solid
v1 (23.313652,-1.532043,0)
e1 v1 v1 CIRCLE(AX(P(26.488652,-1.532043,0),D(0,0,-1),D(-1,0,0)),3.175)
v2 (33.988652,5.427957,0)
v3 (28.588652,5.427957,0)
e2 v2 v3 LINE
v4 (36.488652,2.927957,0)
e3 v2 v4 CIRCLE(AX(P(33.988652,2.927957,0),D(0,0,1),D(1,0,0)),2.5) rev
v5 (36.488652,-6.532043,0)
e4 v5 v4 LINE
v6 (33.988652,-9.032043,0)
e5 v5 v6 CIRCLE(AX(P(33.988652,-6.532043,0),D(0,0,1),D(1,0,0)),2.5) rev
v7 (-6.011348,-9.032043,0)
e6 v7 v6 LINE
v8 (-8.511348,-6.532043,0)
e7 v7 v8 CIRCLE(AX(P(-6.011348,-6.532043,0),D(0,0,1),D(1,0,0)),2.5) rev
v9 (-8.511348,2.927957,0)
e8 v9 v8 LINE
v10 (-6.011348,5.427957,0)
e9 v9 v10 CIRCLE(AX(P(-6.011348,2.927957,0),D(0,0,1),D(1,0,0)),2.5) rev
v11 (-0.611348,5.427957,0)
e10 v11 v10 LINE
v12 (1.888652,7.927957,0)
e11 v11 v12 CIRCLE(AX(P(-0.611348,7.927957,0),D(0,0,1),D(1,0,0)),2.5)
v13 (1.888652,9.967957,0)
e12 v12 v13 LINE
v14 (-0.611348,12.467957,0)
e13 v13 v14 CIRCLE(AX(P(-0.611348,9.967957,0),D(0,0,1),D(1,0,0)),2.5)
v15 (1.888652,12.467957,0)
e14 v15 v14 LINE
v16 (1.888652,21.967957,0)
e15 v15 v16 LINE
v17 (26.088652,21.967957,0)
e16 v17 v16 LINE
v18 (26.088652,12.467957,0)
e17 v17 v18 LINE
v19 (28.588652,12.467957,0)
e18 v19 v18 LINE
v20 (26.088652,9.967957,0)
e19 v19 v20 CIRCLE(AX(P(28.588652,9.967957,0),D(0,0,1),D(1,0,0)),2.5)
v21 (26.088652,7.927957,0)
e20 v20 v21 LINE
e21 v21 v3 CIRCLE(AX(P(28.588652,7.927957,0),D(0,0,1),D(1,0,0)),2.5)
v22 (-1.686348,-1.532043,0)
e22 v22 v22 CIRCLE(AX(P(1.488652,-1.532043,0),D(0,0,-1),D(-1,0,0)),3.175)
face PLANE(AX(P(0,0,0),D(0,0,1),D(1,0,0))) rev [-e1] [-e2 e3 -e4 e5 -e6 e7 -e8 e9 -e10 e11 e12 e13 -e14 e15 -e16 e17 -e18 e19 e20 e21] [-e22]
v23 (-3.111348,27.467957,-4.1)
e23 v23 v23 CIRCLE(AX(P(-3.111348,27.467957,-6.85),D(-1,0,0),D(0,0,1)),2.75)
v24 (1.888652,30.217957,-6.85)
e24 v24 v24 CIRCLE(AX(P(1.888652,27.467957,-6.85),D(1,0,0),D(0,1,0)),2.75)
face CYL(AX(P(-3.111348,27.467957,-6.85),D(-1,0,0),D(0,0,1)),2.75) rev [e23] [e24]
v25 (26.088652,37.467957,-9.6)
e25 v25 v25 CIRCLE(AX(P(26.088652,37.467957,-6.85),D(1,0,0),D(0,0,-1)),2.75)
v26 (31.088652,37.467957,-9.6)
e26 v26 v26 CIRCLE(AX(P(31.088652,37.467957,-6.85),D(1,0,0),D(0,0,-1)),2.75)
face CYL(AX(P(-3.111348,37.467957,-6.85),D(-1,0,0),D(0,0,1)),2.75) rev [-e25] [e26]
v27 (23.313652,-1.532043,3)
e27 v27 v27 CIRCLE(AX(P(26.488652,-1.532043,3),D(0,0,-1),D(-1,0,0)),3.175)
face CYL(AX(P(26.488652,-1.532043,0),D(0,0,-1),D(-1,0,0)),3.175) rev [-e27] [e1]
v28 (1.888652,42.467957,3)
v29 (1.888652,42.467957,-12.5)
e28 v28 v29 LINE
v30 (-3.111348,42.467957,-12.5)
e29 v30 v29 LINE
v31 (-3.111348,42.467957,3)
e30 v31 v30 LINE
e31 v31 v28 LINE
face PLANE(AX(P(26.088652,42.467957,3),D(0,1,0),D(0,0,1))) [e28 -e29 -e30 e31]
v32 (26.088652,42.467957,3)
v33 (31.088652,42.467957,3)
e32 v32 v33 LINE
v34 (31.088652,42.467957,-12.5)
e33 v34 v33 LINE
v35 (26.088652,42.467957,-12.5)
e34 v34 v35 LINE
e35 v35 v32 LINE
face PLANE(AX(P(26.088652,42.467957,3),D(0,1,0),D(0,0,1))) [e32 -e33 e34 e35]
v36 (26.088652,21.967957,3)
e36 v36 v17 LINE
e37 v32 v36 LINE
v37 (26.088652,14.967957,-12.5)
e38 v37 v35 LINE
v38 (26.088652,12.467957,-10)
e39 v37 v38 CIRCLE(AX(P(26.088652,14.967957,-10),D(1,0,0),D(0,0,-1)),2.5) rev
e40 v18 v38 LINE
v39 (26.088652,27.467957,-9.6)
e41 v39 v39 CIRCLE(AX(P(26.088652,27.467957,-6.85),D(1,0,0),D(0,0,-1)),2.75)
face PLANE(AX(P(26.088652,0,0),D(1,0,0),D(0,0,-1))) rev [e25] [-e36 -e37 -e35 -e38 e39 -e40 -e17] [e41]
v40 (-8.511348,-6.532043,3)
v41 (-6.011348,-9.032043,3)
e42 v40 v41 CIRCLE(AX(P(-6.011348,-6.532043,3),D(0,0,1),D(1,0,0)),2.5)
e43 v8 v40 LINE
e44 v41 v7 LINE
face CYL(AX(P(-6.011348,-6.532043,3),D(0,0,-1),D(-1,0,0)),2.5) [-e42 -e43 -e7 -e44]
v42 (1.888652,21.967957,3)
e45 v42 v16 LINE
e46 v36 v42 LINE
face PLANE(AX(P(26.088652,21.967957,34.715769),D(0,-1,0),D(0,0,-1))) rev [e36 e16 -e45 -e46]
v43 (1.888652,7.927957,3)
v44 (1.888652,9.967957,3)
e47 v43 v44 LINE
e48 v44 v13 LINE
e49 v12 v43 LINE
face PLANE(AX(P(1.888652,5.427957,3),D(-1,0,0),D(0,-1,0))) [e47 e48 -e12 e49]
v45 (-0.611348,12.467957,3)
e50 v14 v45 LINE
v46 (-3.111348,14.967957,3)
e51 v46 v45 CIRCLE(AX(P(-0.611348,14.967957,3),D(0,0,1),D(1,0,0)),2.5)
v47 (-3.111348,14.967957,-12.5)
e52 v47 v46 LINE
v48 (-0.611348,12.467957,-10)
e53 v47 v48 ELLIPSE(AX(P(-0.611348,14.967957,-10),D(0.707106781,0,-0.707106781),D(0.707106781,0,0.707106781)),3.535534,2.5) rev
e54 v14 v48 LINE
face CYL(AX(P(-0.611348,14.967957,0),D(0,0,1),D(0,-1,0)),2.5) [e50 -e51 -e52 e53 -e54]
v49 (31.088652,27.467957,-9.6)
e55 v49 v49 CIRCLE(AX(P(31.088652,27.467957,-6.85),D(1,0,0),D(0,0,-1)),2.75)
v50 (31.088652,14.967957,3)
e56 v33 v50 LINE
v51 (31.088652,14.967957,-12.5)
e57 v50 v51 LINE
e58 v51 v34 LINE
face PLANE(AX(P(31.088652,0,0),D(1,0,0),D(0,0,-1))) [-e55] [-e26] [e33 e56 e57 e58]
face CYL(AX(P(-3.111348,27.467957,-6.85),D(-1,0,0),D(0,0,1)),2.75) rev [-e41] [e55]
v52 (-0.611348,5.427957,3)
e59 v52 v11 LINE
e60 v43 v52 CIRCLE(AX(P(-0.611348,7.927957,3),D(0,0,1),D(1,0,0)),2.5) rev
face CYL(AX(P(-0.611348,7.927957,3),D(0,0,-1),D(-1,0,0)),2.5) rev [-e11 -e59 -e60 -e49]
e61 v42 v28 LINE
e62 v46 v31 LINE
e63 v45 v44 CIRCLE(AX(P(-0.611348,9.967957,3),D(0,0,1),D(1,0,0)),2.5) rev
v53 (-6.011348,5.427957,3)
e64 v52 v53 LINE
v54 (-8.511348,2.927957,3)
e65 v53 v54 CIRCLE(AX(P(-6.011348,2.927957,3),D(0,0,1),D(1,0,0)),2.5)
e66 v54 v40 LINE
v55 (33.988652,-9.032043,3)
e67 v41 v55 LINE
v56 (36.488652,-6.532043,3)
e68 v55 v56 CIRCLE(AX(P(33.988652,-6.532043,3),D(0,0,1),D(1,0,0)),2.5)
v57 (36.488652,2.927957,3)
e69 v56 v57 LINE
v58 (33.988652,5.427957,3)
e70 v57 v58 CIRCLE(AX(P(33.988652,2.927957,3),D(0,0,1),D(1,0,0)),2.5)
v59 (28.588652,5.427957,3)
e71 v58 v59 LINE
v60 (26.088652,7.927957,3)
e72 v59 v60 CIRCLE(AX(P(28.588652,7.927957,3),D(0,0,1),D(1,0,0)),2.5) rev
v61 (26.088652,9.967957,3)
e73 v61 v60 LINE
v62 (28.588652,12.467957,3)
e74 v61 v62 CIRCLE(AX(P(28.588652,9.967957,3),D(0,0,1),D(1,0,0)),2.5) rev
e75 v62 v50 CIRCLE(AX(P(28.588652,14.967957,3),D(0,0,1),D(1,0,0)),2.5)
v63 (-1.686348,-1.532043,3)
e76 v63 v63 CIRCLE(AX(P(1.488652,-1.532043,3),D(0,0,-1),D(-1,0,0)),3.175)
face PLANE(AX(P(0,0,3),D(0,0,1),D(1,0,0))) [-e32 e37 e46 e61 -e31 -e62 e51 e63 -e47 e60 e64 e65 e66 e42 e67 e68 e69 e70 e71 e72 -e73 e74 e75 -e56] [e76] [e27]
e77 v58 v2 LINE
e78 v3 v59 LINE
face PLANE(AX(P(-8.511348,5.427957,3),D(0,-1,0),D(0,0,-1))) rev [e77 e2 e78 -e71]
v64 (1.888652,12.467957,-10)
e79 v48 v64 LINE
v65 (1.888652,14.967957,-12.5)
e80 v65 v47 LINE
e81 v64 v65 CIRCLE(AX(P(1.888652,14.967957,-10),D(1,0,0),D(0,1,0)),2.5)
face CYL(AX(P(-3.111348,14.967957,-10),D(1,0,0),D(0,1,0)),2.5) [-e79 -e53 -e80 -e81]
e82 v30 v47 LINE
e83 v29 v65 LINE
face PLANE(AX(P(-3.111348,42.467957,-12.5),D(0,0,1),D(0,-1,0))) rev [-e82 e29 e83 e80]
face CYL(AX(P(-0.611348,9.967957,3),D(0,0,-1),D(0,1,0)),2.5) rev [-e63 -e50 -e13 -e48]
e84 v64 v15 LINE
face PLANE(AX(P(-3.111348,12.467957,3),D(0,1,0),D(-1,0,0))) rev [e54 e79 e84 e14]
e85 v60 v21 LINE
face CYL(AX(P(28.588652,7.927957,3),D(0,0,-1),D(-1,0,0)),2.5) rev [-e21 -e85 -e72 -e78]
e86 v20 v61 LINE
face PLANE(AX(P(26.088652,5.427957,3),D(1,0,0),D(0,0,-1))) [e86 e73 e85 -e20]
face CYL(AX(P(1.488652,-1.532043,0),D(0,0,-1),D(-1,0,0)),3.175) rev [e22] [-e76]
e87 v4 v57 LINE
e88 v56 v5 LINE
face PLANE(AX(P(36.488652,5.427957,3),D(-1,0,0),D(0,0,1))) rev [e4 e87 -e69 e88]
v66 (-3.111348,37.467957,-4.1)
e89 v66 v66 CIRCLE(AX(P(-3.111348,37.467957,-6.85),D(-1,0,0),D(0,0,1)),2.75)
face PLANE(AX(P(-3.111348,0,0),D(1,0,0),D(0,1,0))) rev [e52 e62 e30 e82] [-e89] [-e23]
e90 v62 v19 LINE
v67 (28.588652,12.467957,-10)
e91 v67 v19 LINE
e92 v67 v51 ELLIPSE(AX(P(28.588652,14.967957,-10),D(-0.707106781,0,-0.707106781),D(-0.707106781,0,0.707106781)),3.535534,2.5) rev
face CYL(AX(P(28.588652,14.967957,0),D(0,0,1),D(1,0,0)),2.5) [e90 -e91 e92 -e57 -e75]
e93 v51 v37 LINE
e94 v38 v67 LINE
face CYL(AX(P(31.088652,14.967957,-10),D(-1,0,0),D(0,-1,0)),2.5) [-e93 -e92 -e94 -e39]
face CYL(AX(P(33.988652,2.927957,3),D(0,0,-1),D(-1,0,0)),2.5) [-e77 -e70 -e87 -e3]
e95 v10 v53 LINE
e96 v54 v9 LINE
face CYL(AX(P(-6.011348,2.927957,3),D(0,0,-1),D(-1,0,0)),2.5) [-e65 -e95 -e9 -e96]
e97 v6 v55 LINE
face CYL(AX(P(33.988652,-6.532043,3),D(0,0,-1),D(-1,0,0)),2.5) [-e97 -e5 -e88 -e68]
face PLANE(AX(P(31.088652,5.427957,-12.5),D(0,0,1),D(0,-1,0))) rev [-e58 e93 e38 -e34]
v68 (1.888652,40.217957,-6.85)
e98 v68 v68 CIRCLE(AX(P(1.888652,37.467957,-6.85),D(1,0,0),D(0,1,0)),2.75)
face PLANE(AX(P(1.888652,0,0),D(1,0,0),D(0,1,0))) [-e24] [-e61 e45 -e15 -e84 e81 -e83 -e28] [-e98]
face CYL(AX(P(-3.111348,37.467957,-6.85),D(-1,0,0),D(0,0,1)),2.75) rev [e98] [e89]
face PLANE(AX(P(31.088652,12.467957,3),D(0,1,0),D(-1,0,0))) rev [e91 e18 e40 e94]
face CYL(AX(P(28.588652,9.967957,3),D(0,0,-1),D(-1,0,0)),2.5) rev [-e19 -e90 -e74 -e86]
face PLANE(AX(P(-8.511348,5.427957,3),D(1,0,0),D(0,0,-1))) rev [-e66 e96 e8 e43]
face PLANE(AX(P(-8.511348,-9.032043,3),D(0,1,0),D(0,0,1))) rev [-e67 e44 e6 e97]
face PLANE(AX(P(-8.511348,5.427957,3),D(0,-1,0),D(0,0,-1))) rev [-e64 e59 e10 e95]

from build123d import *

# Parameters (mm, degrees)
SKETCH1_W                   = 45
SKETCH1_H                   = 14.46
BOSS_EXTRUDE1_DEPTH         = 3
F_1_4_0_25_DIAMETER_HOLE1_D = 6.35
SKETCH5_W                   = 24.2
SKETCH5_H                   = 37.04
BOSS_EXTRUDE2_DEPTH         = 3
SKETCH6_W                   = 15.5
SKETCH6_H                   = 30
BOSS_EXTRUDE3_DEPTH         = 5
BOSS_EXTRUDE4_START         = -29.2
SKETCH7_W                   = 15.5
SKETCH7_H                   = 30
BOSS_EXTRUDE4_DEPTH         = 5
SKETCH12_W                  = 24.2
SKETCH12_H                  = 20.5
CUT_EXTRUDE1_DEPTH          = 3
M5_CLEARANCE_HOLE1_D        = 5.5
FILLET3_R                   = 2.5
FILLET4_R                   = 2.5


with BuildPart() as part:
    # Sketch1 → Boss-Extrude1 (new body)
    with BuildSketch(Plane.XY):
        with Locations((13.988651535, -1.802042724)):
            Rectangle(SKETCH1_W, SKETCH1_H)
    extrude(amount=BOSS_EXTRUDE1_DEPTH)

    # 1/4 (0.25) Diameter Hole1 (through all)
    with Locations(Plane(origin=(0, 0, 0), x_dir=(-1, 0, 0), z_dir=(0, 0, -1))):
        with Locations((-26.488651535, -1.532042724), (-1.488651535, -1.532042724)):
            Hole(F_1_4_0_25_DIAMETER_HOLE1_D / 2)

    # Sketch5 → Boss-Extrude2 (add)
    with BuildSketch(Plane(origin=(0, 0, 0), x_dir=(-1, 0, 0), z_dir=(0, 0, -1))):
        with Locations((-13.988651535, 23.947957276)):
            Rectangle(SKETCH5_W, SKETCH5_H)
    extrude(amount=-BOSS_EXTRUDE2_DEPTH)

    # Sketch6 → Boss-Extrude3 (add)
    with BuildSketch(Plane.ZY.offset(-1.888651535)):
        with Locations((-4.75, 27.467957276)):
            Rectangle(SKETCH6_W, SKETCH6_H)
    extrude(amount=BOSS_EXTRUDE3_DEPTH)

    # Sketch7 → Boss-Extrude4 (add)
    with BuildSketch(Plane.ZY.offset(3.111348465).offset(BOSS_EXTRUDE4_START)):
        with Locations((-4.75, 27.467957276)):
            Rectangle(SKETCH7_W, SKETCH7_H)
    extrude(amount=-BOSS_EXTRUDE4_DEPTH)

    # Sketch12 → Cut-Extrude1 (cut)
    with BuildSketch(Plane(origin=(0, 0, 0), x_dir=(-1, 0, 0), z_dir=(0, 0, -1))):
        with Locations((-13.988651535, 32.217957276)):
            Rectangle(SKETCH12_W, SKETCH12_H)
    extrude(amount=-CUT_EXTRUDE1_DEPTH, mode=Mode.SUBTRACT)

    # M5 Clearance Hole1 (through all)
    with Locations(Plane.ZY.offset(3.111348465)):
        with Locations((-6.85, 37.467957276), (-6.85, 27.467957276)):
            Hole(M5_CLEARANCE_HOLE1_D / 2)

    # Fillet3
    fillet3_edges = [part.edges().sort_by_distance(p)[0] for p in [
        (-8.511348465, 5.427957276, 1.5),
        (36.488651535, 5.427957276, 1.5),
        (36.488651535, -9.032042724, 1.5),
        (-8.511348465, -9.032042724, 1.5),
    ]]
    fillet(fillet3_edges, radius=FILLET3_R)

    # Fillet4
    fillet4_edges = [part.edges().sort_by_distance(p)[0] for p in [
        (1.888651535, 5.427957276, 1.5),
        (26.088651535, 5.427957276, 1.5),
        (26.088651535, 12.467957276, 1.5),
        (1.888651535, 12.467957276, 1.5),
        (31.088651535, 12.467957276, -4.75),
        (-3.111348465, 12.467957276, -4.75),
        (28.588651535, 12.467957276, -12.5),
        (-0.611348465, 12.467957276, -12.5),
    ]]
    fillet(fillet4_edges, radius=FILLET4_R - 0.0001)  # a hair under: the kernel refuses the full size


solid = part.part
